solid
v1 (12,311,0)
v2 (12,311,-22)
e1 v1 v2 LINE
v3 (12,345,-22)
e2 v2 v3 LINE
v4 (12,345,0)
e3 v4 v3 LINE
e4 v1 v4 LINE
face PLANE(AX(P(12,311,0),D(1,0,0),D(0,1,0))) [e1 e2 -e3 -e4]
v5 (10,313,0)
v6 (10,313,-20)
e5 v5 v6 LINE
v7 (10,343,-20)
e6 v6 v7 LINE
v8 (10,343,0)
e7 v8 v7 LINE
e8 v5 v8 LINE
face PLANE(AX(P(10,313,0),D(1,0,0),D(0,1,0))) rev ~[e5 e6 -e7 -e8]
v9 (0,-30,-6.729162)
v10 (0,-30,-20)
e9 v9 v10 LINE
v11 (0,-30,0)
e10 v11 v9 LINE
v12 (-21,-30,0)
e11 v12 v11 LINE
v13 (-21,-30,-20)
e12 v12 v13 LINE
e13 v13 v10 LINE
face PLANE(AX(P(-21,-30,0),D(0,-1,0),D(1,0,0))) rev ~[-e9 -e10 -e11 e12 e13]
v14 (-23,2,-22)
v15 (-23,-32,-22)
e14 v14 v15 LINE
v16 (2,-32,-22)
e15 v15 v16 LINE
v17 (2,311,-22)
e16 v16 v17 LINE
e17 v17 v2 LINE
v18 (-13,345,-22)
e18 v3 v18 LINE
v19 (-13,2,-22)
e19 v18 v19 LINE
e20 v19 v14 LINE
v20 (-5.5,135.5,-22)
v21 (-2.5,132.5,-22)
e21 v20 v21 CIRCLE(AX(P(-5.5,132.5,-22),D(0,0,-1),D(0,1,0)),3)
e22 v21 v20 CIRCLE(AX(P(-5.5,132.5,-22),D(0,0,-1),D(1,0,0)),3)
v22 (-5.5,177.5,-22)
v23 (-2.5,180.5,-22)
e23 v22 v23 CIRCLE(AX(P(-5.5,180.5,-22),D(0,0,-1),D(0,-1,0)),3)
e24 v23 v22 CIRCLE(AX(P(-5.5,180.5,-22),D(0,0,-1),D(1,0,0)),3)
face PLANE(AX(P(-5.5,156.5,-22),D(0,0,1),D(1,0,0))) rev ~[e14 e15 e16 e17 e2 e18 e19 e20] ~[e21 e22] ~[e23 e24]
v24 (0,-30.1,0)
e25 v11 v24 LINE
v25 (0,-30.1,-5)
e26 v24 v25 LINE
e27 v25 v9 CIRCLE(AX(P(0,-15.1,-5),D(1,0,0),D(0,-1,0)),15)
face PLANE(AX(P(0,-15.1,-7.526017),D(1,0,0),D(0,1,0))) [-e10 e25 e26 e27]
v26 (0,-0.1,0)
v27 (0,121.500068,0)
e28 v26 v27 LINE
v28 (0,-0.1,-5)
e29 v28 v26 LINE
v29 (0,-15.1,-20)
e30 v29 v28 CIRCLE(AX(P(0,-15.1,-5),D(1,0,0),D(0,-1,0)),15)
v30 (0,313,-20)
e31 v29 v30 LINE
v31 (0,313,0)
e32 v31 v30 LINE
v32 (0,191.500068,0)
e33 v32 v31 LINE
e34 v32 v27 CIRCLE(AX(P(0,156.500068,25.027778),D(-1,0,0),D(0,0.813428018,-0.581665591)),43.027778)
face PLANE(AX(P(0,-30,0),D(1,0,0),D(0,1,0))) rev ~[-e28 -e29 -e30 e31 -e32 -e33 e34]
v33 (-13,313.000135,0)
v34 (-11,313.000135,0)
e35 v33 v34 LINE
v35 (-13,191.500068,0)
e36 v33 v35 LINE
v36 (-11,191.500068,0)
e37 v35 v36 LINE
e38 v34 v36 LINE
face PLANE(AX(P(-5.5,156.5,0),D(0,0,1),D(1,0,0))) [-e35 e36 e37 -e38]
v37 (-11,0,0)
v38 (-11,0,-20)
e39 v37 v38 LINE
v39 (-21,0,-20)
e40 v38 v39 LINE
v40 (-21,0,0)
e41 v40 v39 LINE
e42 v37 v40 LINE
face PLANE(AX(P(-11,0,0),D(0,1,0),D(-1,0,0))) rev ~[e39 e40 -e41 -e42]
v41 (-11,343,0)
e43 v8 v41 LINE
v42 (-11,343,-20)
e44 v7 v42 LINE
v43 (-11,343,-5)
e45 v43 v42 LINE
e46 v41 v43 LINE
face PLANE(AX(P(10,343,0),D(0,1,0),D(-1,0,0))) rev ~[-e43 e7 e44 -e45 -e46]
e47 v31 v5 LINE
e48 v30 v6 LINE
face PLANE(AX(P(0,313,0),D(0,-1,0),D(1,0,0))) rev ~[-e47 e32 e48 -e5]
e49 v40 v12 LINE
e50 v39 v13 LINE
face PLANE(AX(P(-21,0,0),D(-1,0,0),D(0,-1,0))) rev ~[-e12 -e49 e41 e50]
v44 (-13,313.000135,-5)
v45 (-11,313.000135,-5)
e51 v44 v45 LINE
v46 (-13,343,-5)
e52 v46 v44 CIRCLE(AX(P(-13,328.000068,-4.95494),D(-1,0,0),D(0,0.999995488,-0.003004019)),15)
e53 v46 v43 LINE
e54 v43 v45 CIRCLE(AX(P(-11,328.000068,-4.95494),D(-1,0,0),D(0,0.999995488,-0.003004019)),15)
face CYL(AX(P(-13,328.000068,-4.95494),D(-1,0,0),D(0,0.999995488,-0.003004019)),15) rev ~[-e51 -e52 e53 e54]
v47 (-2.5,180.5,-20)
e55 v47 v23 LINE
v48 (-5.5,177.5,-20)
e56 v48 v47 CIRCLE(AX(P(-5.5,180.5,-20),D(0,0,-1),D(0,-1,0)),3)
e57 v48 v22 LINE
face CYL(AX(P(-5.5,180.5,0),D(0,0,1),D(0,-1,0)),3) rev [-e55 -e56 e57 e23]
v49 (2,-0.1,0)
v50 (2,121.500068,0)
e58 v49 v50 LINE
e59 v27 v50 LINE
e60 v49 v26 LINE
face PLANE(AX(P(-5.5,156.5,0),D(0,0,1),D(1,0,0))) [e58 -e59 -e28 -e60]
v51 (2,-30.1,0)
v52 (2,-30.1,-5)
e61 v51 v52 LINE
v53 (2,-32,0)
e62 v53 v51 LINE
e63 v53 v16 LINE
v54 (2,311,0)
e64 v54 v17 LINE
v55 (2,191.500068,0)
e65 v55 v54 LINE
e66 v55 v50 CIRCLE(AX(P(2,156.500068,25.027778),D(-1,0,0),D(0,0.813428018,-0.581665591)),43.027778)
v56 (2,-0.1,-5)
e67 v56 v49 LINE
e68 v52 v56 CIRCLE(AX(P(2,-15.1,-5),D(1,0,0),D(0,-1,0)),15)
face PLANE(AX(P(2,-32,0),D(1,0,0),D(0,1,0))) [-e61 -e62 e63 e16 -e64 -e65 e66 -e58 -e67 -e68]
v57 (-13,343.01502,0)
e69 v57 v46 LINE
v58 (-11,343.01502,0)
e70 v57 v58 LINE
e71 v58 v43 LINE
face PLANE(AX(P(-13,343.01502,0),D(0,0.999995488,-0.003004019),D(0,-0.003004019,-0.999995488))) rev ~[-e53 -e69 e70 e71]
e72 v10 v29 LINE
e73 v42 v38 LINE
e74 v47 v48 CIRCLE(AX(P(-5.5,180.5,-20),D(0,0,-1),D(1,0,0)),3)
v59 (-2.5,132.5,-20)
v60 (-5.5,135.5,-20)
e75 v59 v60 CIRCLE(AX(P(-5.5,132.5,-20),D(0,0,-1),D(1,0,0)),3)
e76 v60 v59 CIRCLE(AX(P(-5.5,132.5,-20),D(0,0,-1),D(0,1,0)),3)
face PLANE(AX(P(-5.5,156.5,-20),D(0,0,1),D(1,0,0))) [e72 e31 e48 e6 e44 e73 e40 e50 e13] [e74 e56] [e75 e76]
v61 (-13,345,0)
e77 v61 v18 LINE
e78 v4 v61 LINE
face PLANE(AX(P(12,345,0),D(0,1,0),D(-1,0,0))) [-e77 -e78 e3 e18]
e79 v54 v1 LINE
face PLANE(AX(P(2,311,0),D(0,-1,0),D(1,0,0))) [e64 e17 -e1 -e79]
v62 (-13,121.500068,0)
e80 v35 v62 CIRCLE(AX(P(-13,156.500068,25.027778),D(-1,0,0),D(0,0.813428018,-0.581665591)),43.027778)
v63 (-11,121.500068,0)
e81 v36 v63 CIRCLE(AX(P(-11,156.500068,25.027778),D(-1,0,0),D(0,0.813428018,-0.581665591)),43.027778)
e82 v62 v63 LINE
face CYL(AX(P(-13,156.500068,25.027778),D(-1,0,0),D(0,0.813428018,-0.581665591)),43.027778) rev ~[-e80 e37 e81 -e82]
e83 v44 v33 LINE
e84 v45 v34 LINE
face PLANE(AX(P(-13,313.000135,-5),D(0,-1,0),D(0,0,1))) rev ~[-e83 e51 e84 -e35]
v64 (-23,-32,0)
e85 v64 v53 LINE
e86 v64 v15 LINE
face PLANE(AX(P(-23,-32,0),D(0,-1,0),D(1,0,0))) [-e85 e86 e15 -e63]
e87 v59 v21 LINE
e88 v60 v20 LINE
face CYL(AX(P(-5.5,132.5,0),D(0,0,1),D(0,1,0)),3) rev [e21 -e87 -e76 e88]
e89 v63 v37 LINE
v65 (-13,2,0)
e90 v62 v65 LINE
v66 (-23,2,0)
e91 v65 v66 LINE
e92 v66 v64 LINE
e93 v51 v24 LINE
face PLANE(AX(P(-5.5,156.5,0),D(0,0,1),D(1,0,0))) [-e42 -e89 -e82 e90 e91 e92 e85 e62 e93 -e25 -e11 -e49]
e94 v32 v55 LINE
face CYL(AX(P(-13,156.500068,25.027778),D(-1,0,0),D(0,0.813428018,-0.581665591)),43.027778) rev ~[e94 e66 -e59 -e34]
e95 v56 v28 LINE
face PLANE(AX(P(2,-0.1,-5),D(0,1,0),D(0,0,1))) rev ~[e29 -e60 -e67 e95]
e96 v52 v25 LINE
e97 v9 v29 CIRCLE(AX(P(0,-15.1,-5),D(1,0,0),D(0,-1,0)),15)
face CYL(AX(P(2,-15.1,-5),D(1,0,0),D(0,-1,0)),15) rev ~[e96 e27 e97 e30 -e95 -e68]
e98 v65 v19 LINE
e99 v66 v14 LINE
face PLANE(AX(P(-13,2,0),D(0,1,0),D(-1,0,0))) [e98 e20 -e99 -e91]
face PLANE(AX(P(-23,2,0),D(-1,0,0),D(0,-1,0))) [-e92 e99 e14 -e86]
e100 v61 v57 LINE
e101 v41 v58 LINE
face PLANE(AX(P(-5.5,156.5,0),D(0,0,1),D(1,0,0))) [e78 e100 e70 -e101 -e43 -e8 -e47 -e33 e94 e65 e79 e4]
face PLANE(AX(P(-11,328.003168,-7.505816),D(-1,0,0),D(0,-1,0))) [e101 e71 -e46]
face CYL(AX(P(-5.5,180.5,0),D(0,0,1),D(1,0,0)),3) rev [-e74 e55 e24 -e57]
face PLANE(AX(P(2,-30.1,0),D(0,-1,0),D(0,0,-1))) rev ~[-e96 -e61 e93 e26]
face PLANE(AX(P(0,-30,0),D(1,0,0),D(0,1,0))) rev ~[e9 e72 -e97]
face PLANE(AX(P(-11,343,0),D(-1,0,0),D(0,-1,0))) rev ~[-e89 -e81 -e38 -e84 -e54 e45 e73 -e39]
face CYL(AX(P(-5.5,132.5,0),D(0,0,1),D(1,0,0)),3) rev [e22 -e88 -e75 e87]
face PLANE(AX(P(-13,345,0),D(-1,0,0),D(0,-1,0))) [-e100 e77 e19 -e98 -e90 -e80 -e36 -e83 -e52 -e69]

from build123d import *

# Parameters (mm, degrees)
F1_DEPTH = 22
F3_DEPTH = 20
F5_DEPTH = 2
F6_DEPTH = 2
F7_DEPTH = 22
F9_DEPTH = 15


# Not quite as in the source:
# - a feature names something its author has since deleted; it is built from what else it names


with BuildPart() as f1:
    # F0 (on Top) → F1 (new body)
    with BuildSketch(Plane.XY):
        Polygon((-13, 345), (-13, 156.5), (-13, 2), (-23, 2), (-23, -32), (2, -32), (2, 311), (12, 311), (12, 345), align=None)
        Polygon((10, 313), (0, 313), (0, -30), (-21, -30), (-21, 0), (-11, 0), (-11, 156.5), (-11, 343), (10, 343), align=None, mode=Mode.SUBTRACT)
        Polygon((0, -30), (0, 313), (10, 313), (10, 343), (-11, 343), (-11, 156.5), (-11, 0), (-21, 0), (-21, -30), align=None)
        with BuildLine():
            ThreePointArc((-2.4999999702, 132.5), (-7.6213203138, 130.3786796564), (-5.4999999702, 135.5))
            ThreePointArc((-5.4999999702, 135.5), (-3.3786796266, 134.6213203436), (-2.4999999702, 132.5))
        make_face(mode=Mode.SUBTRACT)
        with BuildLine():
            ThreePointArc((-2.4999999702, 180.5), (-3.3786796266, 178.3786796564), (-5.4999999702, 177.5))
            ThreePointArc((-5.4999999702, 177.5), (-7.6213203138, 182.6213203436), (-2.4999999702, 180.5))
        make_face(mode=Mode.SUBTRACT)
    extrude(amount=-F1_DEPTH)

    # F0 (on Top) → F3 (cut)
    with BuildSketch(Plane.XY):
        Polygon((0, -30), (0, 313), (10, 313), (10, 343), (-11, 343), (-11, 156.5), (-11, 0), (-21, 0), (-21, -30), align=None)
        with BuildLine():
            ThreePointArc((-2.4999999702, 132.5), (-7.6213203138, 130.3786796564), (-5.4999999702, 135.5))
            ThreePointArc((-5.4999999702, 135.5), (-3.3786796266, 134.6213203436), (-2.4999999702, 132.5))
        make_face(mode=Mode.SUBTRACT)
        with BuildLine():
            ThreePointArc((-2.4999999702, 180.5), (-3.3786796266, 178.3786796564), (-5.4999999702, 177.5))
            ThreePointArc((-5.4999999702, 177.5), (-7.6213203138, 182.6213203436), (-2.4999999702, 180.5))
        make_face(mode=Mode.SUBTRACT)
    extrude(amount=-F3_DEPTH, mode=Mode.SUBTRACT)

    # F4 (on face) → F5 (cut)
    with BuildSketch(Plane.YZ.offset(2)):
        with BuildLine():
            Line((-0.1, 0), (-30.1, 0))
            Line((-30.1, 0), (-30.1, -5))
            ThreePointArc((-30.1, -5), (-15.1, -20), (-0.1, -5))
            Line((-0.1, -5), (-0.1, 0))
        make_face()
    extrude(amount=-F5_DEPTH, mode=Mode.SUBTRACT)

    # F2 (on face) → F6 (cut)
    with BuildSketch(Plane(origin=(-13, 0, 0), x_dir=(0, -1, 0), z_dir=(-1, 0, 0))):
        with BuildLine():
            Line((-343.0150201633, 0), (-343, -5))
            ThreePointArc((-343, -5), (-328.0000676811, -19.9549397135), (-313.0001353623, -5))
            Line((-313.0001353623, -5), (-313.0001353623, 0))
            Line((-313.0001353623, 0), (-343.0150201633, 0))
        make_face()
    extrude(amount=-F6_DEPTH, mode=Mode.SUBTRACT)

    # F0 (on Top) → F7 (cut)
    with BuildSketch(Plane.XY):
        with BuildLine():
            ThreePointArc((-2.4999999702, 180.5), (-7.6213203138, 182.6213203436), (-5.4999999702, 177.5))
            ThreePointArc((-5.4999999702, 177.5), (-3.3786796266, 178.3786796564), (-2.4999999702, 180.5))
        make_face()
    extrude(amount=-F7_DEPTH, mode=Mode.SUBTRACT)

    # F8 (on face) → F9 (cut)
    with BuildSketch(Plane(origin=(-13, 0, 0), x_dir=(0, -1, 0), z_dir=(-1, 0, 0))):
        with BuildLine():
            ThreePointArc((-191.5000676811, 0), (-156.5000676811, -18), (-121.5000676811, 0))
            Line((-121.5000676811, 0), (-156.5000676811, 0))
            Line((-156.5000676811, 0), (-191.5000676811, 0))
        make_face()
    extrude(amount=-F9_DEPTH, mode=Mode.SUBTRACT)


solid = f1.part
